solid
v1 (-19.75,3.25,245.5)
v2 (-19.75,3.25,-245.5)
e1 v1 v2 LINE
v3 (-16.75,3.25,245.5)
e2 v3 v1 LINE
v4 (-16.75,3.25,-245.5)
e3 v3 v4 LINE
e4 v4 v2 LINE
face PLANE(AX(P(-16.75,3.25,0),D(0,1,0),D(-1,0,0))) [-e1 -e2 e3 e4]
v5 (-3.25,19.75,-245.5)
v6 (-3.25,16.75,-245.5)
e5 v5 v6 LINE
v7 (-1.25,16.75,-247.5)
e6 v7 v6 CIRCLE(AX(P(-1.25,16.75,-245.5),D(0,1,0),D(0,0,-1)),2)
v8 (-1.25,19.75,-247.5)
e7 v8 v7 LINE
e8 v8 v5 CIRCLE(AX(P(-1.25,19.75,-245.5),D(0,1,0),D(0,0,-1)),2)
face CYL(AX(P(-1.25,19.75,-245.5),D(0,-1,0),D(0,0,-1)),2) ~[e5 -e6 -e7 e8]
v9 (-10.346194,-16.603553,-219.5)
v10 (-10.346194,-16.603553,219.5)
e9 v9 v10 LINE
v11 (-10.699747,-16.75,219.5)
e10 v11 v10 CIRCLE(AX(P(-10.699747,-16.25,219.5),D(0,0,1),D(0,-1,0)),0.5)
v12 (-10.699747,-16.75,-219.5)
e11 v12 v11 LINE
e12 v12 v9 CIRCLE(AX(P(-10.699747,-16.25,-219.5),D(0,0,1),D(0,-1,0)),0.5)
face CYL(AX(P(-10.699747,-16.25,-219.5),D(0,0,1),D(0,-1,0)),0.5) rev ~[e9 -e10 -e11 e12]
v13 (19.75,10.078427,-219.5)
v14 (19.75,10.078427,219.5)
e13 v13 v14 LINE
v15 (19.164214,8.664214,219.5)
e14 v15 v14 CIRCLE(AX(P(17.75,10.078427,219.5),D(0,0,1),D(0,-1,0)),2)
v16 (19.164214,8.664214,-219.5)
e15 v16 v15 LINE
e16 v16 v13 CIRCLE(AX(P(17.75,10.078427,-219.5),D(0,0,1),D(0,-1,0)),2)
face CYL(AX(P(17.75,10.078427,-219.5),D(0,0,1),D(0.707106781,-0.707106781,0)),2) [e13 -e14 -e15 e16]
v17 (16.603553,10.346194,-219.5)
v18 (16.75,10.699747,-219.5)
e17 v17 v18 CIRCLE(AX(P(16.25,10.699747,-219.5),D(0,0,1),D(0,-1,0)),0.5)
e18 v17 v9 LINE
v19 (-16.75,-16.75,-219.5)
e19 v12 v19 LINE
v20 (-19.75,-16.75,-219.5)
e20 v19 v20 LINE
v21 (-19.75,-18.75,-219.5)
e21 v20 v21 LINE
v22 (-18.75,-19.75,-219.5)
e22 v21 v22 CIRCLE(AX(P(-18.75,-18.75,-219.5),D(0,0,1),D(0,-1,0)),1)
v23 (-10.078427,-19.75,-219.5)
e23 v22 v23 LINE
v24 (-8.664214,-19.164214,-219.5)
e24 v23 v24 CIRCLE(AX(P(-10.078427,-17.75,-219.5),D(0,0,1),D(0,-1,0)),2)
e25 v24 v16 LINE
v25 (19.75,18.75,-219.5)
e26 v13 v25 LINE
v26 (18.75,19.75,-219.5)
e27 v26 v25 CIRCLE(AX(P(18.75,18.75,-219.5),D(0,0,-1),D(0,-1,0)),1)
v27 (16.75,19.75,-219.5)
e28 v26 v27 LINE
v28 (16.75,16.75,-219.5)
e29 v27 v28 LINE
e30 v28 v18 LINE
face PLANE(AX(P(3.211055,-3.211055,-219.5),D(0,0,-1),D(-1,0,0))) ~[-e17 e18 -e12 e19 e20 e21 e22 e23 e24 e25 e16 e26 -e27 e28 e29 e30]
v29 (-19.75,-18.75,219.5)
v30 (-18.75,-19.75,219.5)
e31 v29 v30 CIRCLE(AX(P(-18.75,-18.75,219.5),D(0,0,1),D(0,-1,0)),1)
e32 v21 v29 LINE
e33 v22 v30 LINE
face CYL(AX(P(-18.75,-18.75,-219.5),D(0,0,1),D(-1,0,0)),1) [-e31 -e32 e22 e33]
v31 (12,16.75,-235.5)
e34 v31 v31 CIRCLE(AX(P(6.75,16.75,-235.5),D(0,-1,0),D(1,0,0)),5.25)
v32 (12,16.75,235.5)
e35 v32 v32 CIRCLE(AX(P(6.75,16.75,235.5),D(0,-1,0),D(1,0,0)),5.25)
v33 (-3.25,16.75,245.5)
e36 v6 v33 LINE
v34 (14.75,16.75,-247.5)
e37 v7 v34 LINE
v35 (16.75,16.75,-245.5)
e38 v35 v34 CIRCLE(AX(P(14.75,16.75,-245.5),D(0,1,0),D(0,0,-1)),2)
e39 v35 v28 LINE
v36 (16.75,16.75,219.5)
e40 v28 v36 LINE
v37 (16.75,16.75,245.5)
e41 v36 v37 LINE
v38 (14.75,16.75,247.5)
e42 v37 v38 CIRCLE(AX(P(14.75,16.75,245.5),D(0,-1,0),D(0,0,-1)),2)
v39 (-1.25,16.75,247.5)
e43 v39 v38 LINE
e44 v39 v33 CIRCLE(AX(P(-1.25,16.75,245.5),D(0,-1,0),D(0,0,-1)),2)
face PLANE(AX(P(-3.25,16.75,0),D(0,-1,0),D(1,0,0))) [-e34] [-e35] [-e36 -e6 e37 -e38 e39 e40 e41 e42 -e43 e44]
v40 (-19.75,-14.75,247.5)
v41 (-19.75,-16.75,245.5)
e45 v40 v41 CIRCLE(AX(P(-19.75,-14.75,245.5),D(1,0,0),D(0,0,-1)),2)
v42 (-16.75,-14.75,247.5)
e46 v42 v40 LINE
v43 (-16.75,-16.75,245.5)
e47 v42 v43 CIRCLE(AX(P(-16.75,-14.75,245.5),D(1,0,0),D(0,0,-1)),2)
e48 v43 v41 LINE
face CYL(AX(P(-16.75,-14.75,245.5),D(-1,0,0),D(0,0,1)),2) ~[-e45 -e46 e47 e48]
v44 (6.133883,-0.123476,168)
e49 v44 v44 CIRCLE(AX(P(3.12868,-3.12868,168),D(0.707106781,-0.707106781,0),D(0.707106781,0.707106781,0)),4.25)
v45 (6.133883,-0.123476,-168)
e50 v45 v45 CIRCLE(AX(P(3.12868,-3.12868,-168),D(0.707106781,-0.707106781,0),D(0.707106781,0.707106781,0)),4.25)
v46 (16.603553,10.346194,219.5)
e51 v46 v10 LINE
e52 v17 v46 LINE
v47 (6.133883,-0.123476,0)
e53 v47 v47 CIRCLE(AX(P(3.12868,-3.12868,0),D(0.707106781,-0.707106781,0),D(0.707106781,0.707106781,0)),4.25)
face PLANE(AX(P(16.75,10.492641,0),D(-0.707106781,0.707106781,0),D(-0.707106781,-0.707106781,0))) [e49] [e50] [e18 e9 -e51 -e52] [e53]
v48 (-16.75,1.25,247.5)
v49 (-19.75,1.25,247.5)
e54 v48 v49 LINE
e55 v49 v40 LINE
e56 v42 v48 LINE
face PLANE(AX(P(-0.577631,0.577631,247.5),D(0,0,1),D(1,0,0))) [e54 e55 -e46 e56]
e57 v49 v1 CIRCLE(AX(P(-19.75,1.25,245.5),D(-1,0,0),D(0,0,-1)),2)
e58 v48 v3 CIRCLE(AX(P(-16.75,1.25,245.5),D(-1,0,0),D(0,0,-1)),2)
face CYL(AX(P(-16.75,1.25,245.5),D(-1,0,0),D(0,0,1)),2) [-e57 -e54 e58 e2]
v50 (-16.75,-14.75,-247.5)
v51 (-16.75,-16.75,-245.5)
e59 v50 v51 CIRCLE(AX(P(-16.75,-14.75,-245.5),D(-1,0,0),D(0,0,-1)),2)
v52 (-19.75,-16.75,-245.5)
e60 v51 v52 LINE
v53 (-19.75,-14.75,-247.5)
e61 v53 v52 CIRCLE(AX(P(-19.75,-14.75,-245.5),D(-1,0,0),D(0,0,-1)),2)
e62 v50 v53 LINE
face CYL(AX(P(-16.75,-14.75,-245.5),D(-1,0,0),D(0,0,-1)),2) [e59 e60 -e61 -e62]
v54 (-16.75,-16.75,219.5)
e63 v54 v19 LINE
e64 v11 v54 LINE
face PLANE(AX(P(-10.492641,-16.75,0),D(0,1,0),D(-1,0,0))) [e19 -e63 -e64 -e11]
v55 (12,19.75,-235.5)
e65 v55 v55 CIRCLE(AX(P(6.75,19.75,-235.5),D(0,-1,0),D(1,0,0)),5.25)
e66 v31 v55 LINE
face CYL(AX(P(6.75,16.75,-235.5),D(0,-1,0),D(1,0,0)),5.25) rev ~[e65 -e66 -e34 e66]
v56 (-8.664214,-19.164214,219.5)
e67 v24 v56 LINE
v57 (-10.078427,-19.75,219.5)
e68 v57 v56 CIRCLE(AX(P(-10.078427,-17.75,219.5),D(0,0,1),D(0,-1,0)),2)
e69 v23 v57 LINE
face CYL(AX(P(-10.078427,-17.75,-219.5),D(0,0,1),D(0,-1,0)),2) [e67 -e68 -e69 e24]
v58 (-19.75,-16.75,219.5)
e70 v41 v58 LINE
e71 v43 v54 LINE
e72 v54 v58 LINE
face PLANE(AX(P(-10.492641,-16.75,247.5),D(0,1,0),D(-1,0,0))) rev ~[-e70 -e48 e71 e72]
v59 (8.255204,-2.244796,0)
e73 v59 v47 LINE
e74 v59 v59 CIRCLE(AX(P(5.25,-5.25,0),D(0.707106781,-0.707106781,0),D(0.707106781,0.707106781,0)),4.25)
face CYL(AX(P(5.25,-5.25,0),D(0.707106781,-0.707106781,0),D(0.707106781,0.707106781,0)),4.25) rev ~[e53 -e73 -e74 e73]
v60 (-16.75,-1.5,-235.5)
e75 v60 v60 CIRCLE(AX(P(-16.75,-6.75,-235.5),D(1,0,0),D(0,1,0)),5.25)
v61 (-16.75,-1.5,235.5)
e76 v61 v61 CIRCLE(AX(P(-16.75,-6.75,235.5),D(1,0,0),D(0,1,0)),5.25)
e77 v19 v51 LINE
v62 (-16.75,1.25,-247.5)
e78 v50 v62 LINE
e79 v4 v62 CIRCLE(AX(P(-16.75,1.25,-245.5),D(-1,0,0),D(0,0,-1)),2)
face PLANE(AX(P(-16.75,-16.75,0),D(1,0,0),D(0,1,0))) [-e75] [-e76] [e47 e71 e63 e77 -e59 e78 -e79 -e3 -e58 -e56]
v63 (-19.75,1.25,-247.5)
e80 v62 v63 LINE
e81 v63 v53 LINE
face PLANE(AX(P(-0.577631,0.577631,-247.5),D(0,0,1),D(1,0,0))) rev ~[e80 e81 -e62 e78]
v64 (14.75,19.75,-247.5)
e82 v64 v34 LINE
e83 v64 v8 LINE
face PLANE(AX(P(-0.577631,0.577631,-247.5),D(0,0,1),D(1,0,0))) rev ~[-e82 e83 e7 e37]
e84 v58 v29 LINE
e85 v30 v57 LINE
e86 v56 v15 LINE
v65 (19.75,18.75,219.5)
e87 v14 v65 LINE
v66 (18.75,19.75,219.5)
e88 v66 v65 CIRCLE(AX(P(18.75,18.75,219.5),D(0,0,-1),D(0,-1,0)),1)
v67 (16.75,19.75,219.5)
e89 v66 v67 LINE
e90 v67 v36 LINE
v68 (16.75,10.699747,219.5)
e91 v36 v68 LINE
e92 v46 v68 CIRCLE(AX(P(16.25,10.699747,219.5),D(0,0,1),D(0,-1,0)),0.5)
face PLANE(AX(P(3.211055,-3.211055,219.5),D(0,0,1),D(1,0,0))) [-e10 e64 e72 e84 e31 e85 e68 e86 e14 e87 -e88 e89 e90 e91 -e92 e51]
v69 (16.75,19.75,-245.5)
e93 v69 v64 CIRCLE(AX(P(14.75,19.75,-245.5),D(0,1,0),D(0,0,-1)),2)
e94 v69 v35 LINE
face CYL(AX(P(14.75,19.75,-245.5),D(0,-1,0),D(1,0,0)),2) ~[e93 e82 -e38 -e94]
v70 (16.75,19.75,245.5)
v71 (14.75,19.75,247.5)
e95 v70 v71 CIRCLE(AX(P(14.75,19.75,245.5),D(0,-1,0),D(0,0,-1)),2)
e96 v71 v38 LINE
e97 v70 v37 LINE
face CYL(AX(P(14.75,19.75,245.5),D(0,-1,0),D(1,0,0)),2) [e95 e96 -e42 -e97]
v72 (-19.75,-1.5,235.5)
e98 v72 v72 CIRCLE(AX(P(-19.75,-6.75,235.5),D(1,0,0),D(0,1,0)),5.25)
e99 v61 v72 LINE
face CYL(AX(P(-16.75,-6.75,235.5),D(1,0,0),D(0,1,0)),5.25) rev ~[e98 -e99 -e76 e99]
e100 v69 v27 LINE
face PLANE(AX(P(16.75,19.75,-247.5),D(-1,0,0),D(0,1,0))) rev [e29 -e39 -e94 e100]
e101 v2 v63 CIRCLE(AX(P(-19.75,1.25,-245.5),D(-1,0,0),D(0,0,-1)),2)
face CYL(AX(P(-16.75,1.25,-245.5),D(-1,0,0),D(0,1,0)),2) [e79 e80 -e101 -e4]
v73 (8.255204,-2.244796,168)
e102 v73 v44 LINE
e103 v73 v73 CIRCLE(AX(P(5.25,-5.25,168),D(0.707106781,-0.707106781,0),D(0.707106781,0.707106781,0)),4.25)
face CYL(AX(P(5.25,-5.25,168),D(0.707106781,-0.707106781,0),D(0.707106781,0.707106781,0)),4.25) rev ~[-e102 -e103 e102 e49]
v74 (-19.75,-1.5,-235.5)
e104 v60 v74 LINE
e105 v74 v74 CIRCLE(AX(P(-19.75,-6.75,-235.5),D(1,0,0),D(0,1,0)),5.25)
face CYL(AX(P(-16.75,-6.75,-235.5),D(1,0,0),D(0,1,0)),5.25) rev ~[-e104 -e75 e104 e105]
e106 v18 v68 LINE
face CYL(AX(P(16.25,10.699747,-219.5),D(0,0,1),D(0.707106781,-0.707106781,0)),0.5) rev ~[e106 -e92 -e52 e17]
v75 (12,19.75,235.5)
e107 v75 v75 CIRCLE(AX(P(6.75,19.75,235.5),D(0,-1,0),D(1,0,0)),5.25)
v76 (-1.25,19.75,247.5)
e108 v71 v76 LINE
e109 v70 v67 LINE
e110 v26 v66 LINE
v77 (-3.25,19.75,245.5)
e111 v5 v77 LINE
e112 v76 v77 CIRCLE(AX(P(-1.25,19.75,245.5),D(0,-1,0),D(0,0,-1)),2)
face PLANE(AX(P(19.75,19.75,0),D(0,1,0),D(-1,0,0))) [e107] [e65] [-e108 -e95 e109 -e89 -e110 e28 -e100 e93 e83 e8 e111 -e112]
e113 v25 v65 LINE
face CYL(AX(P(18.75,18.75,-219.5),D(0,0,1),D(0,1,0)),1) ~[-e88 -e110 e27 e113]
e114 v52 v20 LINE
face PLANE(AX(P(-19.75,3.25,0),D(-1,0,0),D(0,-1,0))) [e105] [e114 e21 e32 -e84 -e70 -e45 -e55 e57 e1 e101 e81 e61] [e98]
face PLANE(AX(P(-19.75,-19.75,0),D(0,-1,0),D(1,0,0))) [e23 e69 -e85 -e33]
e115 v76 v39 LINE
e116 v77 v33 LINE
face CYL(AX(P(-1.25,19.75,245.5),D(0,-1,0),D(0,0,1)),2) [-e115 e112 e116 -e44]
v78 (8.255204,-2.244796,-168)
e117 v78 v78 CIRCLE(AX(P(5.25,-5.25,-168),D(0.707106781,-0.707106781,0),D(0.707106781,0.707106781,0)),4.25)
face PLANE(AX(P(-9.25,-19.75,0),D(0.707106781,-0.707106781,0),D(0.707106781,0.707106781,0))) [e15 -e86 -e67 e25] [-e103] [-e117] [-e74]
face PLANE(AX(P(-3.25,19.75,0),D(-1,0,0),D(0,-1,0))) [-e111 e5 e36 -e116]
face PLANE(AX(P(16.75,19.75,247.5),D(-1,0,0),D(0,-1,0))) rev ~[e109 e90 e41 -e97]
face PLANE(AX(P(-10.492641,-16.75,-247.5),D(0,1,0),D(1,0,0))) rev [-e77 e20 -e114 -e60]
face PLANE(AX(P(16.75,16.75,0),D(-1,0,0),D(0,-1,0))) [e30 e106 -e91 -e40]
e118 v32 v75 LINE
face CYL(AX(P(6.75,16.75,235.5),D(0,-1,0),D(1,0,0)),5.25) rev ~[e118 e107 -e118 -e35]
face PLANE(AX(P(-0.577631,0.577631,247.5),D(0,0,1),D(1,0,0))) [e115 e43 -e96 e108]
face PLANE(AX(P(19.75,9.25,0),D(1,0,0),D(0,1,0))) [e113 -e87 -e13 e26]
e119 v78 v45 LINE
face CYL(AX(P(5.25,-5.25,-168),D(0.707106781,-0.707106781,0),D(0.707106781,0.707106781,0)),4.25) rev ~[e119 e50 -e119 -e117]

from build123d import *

# Parameters (mm, degrees)
F1_DEPTH = 247.5
F3_DEPTH = 28
F4_R     = 4.25
F5_DEPTH = 25
F6_R     = 5.25
F7_DEPTH = 25
F8_R     = 5.25
F9_DEPTH = 25
F10_R    = 2
F11_R    = 0.5
F12_R    = 1


# Not quite as in the source:
# - a pattern or mirror of a feature is missing from the dataset's text; its kind, count and spacing are read off the source's solid


with BuildPart() as f1:
    # F0 (on Top) → F1 (new body, symmetric)
    with BuildSketch(Plane.XY):
        Polygon((-19.75, 3.25), (-19.75, -19.75), (-9.25, -19.75), (19.75, 9.25), (19.75, 19.75), (-3.25, 19.75), (-3.25, 16.75), (16.75, 16.75), (16.75, 10.4926406871), (-10.4926406871, -16.75), (-16.75, -16.75), (-16.75, 3.25), align=None)
    extrude(amount=F1_DEPTH, both=True)

    # F2 (on face) → F3 (cut)
    with BuildSketch(Plane.XY.offset(247.5)):
        Polygon((-10.4926406871, -16.75), (-16.75, -16.75), (-19.75, -16.75), (-19.75, -19.75), (-9.25, -19.75), (19.75, 9.25), (19.75, 19.75), (16.75, 19.75), (16.75, 16.75), (16.75, 10.4926406871), align=None)
    f3 = extrude(amount=-F3_DEPTH, mode=Mode.SUBTRACT)

    # F3_copies: F3 across plane
    add(f3.mirror(Plane(origin=(0, 0, 0), x_dir=(-1, 0, 0), z_dir=(0, 0, -1))), mode=Mode.SUBTRACT)

    # F4 (on face) → F5 (cut)
    with BuildSketch(Plane(origin=(5.25, -5.25, 0), x_dir=(0.7071067812, 0.7071067812, 0), z_dir=(0.7071067812, -0.7071067812, 0))):
        with Locations((0, 168)):
            Circle(F4_R)
        with Locations((0, -168)):
            Circle(F4_R)
        Circle(F4_R)
    extrude(amount=-F5_DEPTH, mode=Mode.SUBTRACT)

    # F6 (on face) → F7 (cut)
    with BuildSketch(Plane.YZ.offset(-16.75)):
        with Locations((-6.75, 235.5)):
            Circle(F6_R)
        with Locations((-6.75, -235.5)):
            Circle(F6_R)
    extrude(amount=-F7_DEPTH, mode=Mode.SUBTRACT)

    # F8 (on face) → F9 (cut)
    with BuildSketch(Plane.XZ.offset(-16.75)):
        with Locations((6.75, 235.5)):
            Circle(F8_R)
        with Locations((6.75, -235.5)):
            Circle(F8_R)
    extrude(amount=-F9_DEPTH, mode=Mode.SUBTRACT)

    # F10
    f10_edges = [f1.edges().sort_by_distance(p)[0] for p in [
        (-9.25, -19.75, 0),
        (19.75, 9.25, 0),
        (-18.25, -16.75, 247.5),
        (-18.25, 3.25, 247.5),
        (-3.25, 18.25, 247.5),
        (16.75, 18.25, 247.5),
        (-18.25, 3.25, -247.5),
        (-3.25, 18.25, -247.5),
        (-18.25, -16.75, -247.5),
        (16.75, 18.25, -247.5),
    ]]
    fillet(f10_edges, radius=F10_R)

    # F11
    f11_edges = [f1.edges().sort_by_distance(p)[0] for p in [
        (-10.492641, -16.75, 0),
        (16.75, 10.492641, 0),
    ]]
    fillet(f11_edges, radius=F11_R)

    # F12
    f12_edges = [f1.edges().sort_by_distance(p)[0] for p in [
        (-19.75, -19.75, 0),
        (19.75, 19.75, 0),
    ]]
    fillet(f12_edges, radius=F12_R)


solid = f1.part
